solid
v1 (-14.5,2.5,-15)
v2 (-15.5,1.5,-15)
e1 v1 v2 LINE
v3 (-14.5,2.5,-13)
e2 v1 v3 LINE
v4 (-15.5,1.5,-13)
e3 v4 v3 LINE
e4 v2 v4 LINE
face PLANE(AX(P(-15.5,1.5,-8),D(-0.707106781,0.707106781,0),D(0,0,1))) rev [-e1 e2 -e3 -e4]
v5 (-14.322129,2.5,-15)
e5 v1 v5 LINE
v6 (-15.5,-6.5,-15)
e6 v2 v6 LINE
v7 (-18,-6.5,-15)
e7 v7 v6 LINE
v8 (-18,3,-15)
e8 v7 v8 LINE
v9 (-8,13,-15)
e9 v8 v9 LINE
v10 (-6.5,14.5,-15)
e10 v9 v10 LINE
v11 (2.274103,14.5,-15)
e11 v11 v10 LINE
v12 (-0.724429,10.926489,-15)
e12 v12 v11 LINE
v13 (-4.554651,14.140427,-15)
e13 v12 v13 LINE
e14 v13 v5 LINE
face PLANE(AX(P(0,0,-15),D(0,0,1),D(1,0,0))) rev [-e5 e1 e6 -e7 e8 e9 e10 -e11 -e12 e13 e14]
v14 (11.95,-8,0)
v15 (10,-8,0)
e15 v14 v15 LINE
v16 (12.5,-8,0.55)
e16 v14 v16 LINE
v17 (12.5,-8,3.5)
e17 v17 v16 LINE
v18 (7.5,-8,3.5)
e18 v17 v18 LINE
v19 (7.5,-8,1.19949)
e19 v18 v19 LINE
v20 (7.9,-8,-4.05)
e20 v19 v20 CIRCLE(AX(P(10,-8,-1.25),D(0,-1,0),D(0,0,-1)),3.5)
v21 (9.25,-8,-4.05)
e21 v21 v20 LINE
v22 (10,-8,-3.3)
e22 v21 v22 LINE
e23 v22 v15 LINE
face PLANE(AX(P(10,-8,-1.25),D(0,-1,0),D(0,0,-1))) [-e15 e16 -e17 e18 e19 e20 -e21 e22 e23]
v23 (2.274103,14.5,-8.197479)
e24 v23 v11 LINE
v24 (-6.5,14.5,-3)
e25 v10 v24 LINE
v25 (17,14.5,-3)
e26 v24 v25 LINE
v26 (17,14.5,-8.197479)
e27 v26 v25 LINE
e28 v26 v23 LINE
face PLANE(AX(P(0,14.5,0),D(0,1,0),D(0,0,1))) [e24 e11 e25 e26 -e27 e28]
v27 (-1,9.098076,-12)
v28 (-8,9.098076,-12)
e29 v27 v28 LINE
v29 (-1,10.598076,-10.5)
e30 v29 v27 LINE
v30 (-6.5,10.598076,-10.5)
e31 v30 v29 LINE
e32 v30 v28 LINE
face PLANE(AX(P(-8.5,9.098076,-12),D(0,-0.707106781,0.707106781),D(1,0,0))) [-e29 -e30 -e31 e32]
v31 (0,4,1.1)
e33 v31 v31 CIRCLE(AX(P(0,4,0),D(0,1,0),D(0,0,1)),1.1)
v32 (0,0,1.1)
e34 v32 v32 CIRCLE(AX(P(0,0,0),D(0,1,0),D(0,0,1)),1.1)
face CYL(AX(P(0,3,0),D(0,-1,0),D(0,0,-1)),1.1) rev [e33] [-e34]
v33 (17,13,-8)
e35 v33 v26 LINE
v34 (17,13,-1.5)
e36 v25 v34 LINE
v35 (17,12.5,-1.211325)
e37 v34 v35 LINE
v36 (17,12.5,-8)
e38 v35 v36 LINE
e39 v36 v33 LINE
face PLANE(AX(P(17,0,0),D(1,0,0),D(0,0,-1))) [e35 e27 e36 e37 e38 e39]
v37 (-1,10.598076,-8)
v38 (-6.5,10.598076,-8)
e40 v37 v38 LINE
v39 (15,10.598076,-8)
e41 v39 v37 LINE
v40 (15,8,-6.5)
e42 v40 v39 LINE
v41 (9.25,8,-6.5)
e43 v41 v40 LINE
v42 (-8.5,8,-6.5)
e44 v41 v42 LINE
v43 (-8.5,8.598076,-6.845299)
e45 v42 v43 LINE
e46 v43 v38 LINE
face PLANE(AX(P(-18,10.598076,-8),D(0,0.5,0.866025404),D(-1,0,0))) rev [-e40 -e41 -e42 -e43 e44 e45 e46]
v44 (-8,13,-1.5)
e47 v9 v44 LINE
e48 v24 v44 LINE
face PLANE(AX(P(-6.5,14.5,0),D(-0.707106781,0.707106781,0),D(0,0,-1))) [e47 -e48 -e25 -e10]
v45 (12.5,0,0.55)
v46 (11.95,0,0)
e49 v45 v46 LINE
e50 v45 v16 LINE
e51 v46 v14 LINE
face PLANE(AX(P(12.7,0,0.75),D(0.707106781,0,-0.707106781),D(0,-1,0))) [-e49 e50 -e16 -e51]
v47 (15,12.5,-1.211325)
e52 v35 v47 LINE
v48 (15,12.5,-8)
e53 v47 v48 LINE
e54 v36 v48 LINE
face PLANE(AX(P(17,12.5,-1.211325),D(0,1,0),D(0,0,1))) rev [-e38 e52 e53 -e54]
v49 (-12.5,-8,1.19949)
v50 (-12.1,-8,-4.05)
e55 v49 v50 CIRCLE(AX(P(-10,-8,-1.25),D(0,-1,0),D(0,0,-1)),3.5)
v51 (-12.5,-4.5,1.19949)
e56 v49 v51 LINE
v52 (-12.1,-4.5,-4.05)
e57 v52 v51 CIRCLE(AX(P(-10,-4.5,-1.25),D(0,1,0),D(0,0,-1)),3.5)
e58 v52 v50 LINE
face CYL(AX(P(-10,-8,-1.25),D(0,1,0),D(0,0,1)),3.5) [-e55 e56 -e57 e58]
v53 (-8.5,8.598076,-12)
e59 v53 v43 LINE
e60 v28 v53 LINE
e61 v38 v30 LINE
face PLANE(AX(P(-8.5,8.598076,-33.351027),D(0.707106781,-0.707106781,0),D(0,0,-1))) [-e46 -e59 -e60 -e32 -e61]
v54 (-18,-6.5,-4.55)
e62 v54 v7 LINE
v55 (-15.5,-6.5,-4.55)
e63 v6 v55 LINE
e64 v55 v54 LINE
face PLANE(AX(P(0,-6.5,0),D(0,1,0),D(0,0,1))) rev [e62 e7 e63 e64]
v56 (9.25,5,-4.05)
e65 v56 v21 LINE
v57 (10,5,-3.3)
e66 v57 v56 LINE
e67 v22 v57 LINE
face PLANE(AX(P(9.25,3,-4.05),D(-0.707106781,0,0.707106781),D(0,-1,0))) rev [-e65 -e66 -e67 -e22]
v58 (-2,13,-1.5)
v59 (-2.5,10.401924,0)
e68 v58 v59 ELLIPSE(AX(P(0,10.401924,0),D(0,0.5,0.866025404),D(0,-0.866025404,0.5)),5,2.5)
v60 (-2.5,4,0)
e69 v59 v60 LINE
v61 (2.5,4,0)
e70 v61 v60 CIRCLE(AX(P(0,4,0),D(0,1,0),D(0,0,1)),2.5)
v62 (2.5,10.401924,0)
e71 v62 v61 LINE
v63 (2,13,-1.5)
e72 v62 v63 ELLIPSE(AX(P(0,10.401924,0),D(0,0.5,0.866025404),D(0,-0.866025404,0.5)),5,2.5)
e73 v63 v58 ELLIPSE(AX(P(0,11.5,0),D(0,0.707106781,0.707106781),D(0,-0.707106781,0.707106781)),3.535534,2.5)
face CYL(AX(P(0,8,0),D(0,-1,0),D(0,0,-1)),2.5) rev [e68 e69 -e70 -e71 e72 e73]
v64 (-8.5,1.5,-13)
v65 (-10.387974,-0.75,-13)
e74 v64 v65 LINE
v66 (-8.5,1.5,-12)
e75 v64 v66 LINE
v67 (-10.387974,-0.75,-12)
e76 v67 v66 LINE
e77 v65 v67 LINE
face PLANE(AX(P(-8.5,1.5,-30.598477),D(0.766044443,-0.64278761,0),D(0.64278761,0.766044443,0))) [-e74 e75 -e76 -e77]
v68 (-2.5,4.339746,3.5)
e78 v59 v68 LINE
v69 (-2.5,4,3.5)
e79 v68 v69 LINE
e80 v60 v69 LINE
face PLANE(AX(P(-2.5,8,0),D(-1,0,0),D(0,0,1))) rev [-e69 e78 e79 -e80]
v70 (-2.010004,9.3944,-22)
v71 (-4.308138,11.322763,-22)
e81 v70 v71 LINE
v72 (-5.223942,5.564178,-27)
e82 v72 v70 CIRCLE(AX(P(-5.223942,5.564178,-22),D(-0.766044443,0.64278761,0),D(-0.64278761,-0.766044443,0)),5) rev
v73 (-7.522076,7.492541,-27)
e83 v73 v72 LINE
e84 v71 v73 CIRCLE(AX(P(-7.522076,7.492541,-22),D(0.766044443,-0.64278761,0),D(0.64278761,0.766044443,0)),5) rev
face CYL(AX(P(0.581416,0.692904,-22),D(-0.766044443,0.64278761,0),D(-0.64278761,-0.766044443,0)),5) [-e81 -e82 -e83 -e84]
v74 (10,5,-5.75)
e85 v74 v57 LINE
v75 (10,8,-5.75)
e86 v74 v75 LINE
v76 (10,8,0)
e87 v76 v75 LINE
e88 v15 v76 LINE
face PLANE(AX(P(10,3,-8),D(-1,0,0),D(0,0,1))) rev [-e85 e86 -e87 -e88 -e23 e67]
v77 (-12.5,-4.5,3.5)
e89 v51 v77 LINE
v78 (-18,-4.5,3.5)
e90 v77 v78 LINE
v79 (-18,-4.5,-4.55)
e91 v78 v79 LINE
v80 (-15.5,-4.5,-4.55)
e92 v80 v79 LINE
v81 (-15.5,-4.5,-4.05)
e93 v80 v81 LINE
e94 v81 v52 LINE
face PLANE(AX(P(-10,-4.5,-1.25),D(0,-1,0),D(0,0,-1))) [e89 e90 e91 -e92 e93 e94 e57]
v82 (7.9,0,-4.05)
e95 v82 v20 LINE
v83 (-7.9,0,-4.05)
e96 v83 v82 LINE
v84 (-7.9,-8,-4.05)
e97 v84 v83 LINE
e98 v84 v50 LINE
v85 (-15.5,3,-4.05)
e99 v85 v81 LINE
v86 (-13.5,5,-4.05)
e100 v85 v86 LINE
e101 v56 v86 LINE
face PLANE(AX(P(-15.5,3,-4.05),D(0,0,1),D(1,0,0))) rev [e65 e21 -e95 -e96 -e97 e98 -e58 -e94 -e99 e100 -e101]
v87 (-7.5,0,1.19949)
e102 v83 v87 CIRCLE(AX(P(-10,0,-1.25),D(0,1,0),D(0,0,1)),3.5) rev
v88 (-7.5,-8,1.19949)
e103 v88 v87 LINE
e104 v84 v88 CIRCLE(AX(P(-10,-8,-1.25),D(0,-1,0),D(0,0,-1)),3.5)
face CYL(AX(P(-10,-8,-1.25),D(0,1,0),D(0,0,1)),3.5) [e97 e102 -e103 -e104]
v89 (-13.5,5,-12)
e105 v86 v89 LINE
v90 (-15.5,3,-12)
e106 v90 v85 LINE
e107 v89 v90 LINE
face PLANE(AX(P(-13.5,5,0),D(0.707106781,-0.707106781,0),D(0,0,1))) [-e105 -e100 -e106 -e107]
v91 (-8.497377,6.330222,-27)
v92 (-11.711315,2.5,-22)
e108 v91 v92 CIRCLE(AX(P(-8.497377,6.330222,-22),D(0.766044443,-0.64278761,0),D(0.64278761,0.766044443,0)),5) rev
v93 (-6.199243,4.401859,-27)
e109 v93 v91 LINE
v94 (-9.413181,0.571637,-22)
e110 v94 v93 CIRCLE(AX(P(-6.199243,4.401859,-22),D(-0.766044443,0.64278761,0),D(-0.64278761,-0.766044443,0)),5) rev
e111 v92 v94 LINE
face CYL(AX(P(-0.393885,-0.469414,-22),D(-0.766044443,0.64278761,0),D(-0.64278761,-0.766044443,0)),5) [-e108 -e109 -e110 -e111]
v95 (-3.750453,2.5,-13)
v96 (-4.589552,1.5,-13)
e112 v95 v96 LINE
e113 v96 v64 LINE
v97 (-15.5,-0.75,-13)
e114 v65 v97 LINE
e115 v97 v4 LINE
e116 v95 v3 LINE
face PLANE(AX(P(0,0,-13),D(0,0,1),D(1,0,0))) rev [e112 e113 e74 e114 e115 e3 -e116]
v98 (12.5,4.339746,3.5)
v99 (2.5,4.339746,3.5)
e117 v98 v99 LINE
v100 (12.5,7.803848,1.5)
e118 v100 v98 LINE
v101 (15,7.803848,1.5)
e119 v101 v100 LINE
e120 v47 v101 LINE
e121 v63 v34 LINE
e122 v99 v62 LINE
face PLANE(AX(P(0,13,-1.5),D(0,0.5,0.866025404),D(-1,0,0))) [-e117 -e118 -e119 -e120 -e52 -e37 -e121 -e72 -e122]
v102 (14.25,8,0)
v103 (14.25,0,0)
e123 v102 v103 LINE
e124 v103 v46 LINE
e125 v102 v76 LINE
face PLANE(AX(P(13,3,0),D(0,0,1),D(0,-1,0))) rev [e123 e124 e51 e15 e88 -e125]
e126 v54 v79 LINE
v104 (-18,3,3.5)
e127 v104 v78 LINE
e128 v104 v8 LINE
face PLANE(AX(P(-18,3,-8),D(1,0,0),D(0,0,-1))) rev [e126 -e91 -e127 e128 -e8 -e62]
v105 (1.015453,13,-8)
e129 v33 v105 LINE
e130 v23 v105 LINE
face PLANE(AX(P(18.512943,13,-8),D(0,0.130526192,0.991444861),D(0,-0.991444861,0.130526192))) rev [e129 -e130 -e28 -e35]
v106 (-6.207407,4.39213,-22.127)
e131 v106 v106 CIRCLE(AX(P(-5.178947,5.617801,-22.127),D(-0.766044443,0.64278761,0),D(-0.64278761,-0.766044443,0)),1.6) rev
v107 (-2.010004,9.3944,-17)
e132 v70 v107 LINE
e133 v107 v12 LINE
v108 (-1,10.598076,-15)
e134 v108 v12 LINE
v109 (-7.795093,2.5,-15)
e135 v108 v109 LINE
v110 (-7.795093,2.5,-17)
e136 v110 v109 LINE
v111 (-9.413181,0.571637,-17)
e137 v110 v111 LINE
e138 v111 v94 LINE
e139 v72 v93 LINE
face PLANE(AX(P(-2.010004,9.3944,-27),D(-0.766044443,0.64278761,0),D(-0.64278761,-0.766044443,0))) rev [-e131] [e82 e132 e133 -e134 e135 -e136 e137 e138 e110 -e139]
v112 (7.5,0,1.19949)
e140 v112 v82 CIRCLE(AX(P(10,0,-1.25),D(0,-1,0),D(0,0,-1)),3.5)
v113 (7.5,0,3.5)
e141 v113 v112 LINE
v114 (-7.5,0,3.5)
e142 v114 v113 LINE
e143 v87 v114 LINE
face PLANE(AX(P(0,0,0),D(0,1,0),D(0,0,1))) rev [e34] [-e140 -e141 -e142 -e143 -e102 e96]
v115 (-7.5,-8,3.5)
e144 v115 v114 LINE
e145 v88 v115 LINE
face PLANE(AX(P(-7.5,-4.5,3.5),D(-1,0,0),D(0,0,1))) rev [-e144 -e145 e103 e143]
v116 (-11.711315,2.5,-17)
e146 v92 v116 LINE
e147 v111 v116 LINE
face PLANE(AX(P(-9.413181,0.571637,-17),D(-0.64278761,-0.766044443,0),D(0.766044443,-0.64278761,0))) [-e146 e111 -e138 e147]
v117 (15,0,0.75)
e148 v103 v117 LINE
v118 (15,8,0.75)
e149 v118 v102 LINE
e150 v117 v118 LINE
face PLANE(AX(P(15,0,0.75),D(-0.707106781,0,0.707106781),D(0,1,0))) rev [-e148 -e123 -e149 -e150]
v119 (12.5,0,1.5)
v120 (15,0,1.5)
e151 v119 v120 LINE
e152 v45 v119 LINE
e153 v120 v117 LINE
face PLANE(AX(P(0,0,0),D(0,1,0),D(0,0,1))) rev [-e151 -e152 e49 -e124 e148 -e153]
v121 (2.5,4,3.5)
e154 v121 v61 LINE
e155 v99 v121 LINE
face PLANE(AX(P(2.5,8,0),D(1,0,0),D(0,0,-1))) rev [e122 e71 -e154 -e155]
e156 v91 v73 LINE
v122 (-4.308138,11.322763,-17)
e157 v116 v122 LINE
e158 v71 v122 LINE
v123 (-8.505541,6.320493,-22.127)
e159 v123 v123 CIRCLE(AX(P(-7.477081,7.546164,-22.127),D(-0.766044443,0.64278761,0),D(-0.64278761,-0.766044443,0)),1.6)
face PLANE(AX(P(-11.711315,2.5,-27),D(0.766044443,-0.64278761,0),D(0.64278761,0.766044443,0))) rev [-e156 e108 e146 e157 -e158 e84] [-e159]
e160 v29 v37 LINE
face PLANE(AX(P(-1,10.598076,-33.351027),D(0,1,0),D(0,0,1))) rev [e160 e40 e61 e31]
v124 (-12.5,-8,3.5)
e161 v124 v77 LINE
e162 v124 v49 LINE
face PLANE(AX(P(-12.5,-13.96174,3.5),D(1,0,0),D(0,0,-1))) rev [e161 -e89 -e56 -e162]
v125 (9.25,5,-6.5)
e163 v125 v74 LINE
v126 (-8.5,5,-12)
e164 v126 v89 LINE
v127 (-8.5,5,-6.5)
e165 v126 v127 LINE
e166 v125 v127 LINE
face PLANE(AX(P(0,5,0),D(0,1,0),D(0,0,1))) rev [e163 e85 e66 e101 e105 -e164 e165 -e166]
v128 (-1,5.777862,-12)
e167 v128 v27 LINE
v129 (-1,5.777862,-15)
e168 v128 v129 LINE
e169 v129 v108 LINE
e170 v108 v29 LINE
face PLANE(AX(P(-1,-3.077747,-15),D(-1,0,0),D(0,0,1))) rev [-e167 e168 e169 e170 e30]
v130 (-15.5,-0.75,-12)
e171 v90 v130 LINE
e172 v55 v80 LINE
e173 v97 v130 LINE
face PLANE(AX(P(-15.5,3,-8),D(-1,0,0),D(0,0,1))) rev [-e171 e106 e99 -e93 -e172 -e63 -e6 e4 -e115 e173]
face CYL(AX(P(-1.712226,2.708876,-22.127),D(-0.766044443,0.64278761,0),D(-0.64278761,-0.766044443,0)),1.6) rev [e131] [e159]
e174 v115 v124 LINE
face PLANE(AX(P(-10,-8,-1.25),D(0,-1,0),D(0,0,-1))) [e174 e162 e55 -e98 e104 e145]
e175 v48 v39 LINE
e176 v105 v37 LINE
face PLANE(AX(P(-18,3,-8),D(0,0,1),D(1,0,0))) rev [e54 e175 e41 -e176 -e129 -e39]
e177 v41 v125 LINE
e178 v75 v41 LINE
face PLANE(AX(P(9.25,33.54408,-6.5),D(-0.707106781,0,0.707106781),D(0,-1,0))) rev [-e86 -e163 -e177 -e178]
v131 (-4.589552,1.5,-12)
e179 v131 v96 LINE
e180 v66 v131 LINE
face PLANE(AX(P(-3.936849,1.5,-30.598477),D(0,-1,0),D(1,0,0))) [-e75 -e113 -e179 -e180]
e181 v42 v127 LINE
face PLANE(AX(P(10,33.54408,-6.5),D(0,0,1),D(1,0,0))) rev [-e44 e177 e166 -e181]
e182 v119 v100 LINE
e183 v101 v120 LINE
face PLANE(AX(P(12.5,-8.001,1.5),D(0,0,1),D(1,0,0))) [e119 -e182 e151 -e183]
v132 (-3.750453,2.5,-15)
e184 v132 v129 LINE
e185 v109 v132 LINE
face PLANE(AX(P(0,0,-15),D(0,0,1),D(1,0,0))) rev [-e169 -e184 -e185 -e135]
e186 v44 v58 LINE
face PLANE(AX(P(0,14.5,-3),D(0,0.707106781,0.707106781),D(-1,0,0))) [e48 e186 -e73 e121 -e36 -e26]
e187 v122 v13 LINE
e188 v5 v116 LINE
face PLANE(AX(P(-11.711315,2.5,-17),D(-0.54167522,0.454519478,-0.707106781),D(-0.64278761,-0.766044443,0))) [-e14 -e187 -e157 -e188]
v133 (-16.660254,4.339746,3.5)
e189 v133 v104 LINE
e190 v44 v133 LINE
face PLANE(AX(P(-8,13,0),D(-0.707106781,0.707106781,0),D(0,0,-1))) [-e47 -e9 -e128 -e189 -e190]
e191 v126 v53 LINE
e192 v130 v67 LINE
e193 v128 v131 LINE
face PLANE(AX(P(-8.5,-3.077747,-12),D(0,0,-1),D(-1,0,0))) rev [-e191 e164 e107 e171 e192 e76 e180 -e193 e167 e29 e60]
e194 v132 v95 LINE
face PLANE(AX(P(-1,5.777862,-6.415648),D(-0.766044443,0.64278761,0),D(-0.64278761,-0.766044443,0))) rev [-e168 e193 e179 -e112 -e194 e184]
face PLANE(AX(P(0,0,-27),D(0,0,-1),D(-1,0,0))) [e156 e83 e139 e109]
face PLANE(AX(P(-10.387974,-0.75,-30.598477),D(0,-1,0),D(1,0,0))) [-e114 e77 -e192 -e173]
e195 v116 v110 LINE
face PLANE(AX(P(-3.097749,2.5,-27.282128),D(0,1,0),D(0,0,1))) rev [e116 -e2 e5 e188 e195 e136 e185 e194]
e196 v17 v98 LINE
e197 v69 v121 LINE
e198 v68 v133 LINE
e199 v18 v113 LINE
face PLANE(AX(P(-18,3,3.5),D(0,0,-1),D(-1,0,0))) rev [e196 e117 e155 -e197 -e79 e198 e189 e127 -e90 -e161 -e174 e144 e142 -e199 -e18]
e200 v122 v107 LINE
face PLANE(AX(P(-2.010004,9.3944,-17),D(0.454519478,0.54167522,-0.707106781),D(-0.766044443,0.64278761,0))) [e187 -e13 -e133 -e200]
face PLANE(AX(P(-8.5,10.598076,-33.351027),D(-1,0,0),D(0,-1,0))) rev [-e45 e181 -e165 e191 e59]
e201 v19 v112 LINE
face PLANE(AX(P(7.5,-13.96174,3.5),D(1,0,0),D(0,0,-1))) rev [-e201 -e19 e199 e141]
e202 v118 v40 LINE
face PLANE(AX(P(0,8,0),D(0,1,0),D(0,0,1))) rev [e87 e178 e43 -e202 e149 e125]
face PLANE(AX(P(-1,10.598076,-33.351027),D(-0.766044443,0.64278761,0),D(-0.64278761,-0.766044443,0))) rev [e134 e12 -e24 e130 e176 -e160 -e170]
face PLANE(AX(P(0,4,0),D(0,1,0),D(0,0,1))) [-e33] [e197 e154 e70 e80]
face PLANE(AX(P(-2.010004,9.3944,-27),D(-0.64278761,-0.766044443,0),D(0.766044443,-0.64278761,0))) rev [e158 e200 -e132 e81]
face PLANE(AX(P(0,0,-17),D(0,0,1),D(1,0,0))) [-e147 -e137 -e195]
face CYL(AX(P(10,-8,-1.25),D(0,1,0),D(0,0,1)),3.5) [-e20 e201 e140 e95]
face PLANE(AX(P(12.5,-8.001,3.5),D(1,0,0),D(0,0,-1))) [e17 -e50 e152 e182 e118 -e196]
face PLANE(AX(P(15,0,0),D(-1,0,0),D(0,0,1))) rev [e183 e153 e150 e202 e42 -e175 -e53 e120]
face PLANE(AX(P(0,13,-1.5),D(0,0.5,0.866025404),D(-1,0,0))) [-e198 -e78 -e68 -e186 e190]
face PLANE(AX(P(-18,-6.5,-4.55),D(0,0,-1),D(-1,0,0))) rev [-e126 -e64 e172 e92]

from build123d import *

# Parameters (mm, degrees)
SKETCH_1_W                      = 28
SKETCH_1_H                      = 11.5
SKETCH_1_R                      = 1.1
EXTRUDE_1_DEPTH                 = 3
SKETCH_2_R                      = 3.5
EXTRUDE_2_DEPTH                 = 8
CUT_EXTRUDE_1_DEPTH             = 22.260291625
CUT_EXTRUDE_1_DEPTH_BACK        = 22.260291625
SKETCH_3_W                      = 25.5
SKETCH_3_H                      = 3.95
EXTRUDE_3_DEPTH                 = 3
SKETCH_5_W                      = 3.5
SKETCH_5_H                      = 3
EXTRUDE_4_DEPTH                 = 2
EXTRUDE_5_DEPTH                 = 5
EXTRUDE_6_DEPTH                 = 5
SKETCH_8_W                      = 25.5
SKETCH_8_H                      = 3.95
EXTRUDE_7_DEPTH                 = 3
EXTRUDE_8_DEPTH                 = 4.5
SKETCH_10_W                     = 2.5
SKETCH_10_H                     = 17.5
EXTRUDE_9_DEPTH                 = 7
SKETCH_11_W                     = 25.5
SKETCH_11_H                     = 1.5
CUT_EXTRUDE_2_DEPTH             = 3
CHAMFER_1_SIZE                  = 1.5
CHAMFER_1_SIZE2                 = 2.598076211
EXTRUDE_10_REACH                = 31.245
EXTRUDE_10_DIRECTION_2_REACH    = 31.245
SKETCH_13_W                     = 3.5
SKETCH_13_H                     = 8
CUT_EXTRUDE_3_DEPTH             = 0.3
CHAMFER_2_SIZE                  = 0.75
SKETCH_14_W                     = 2.5
SKETCH_14_H                     = 2
CUT_EXTRUDE_4_DEPTH             = 30.244657632
CUT_EXTRUDE_4_DIRECTION_2_REACH = 31.245
CUT_EXTRUDE_5_REACH             = 29.663
SKETCH_15_W                     = 2.5
SKETCH_15_H                     = 8
SKETCH_16_R                     = 1.1
EXTRUDE_11_DEPTH                = 1
EXTRUDE_12_DEPTH                = 8.5
SKETCH_20_W                     = 7.5
SKETCH_20_H                     = 3
EXTRUDE_14_DEPTH                = 5.598076211
EXTRUDE_15_DEPTH                = 3
CUT_EXTRUDE_6_DEPTH             = 2
SKETCH_24_W                     = 2.5
SKETCH_24_H                     = 10.45
EXTRUDE_16_DEPTH                = 2
CUT_EXTRUDE_7_REACH             = 29.663
SKETCH_25_W                     = 13.241350553
SKETCH_25_H                     = 2
CHAMFER_3_SIZE                  = 1.5
CHAMFER_5_SIZE                  = 5
CHAMFER_5_SIZE2                 = 8.660254038
CHAMFER_6_SIZE                  = 10
CHAMFER_7_SIZE                  = 2
CHAMFER_8_SIZE                  = 2
EXTRUDE_17_DEPTH                = 1.5
EXTRUDE_21_DEPTH                = 2
EXTRUDE_18_DEPTH                = 2
CHAMFER_9_SIZE                  = 1.5
EXTRUDE_19_DEPTH                = 15.984546635
EXTRUDE_20_REACH                = 31.606
CUT_EXTRUDE_8_REACH             = 31.606
EXTRUDE_22_DEPTH                = 12
SKETCH_36_R                     = 1.6
CUT_EXTRUDE_9_DEPTH             = 3
EXTRUDE_23_DEPTH                = 10
FILLET_1_R                      = 5


# Some blends are built 0.0001 mm under size
with BuildPart() as part:
    # 草图1 → 凸台-拉伸1 (new body)
    with BuildSketch(Plane(origin=(0, 0, 0), x_dir=(1, 0, 0), z_dir=(0, 1, 0))):
        with Locations((-4, 2.25)):
            Rectangle(SKETCH_1_W, SKETCH_1_H)
        with Locations(Location((0, 0, 0), (0, 0, 270))):
            Circle(SKETCH_1_R, mode=Mode.SUBTRACT)
    extrude(amount=EXTRUDE_1_DEPTH)

    # 草图2 → 凸台-拉伸2 (add)
    with BuildSketch(Plane.XZ):
        with Locations(Location((-10, -1.25, 0), (0, 0, 90))):
            Circle(SKETCH_2_R)
        with BuildLine():
            Line((10, 2.25), (10, -4.75))
            ThreePointArc((10, -4.75), (6.5, -1.25), (10, 2.25))
        make_face()
    extrude(amount=EXTRUDE_2_DEPTH)

    # 草图3 → 切除-拉伸1 (cut, two sides: drawn at the far end of the back side and taken through both)
    with BuildSketch(Plane.XZ.offset(-CUT_EXTRUDE_1_DEPTH_BACK)):
        with Locations((-2.75, -6.025)):
            Rectangle(SKETCH_3_W, SKETCH_3_H)
    extrude(amount=CUT_EXTRUDE_1_DEPTH + CUT_EXTRUDE_1_DEPTH_BACK, mode=Mode.SUBTRACT)

    # 草图4 → 凸台-拉伸3 (add)
    with BuildSketch(Plane(origin=(10, 0, 0), x_dir=(0, 0, -1), z_dir=(1, 0, 0))):
        Polygon((0, 3), (0, -8), (-2.25, -8), (-2.25, 0), (-3.5, 0), (-3.5, 3), align=None)
    extrude(amount=EXTRUDE_3_DEPTH)

    # 草图5 → 凸台-拉伸4 (add)
    with BuildSketch(Plane(origin=(13, 0, 0), x_dir=(0, 0, -1), z_dir=(1, 0, 0))):
        with Locations((-1.75, 1.5)):
            Rectangle(SKETCH_5_W, SKETCH_5_H)
    extrude(amount=EXTRUDE_4_DEPTH)

    # 草图6 → 凸台-拉伸5 (add)
    with BuildSketch(Plane(origin=(0, 3, 0), x_dir=(1, 0, 0), z_dir=(0, 1, 0))):
        with BuildLine():
            Line((-2.5, 0), (-2.5, -3.5))
            Line((-2.5, -3.5), (-18, -3.5))
            Line((-18, -3.5), (-18, 8))
            Line((-18, 8), (-15.5, 8))
            Line((-15.5, 8), (-15.5, 4.05))
            Line((-15.5, 4.05), (10, 4.05))
            Line((10, 4.05), (10, 0))
            Line((10, 0), (15, 0))
            Line((15, 0), (15, -3.5))
            Line((15, -3.5), (2.5, -3.5))
            Line((2.5, -3.5), (2.5, 0))
            ThreePointArc((2.5, 0), (0, 2.5), (-2.5, 0))
        make_face()
    extrude(amount=EXTRUDE_5_DEPTH)

    # 草图7 → 凸台-拉伸6 (add)
    with BuildSketch(Plane(origin=(0, 8, 0), x_dir=(1, 0, 0), z_dir=(0, 1, 0))):
        with BuildLine():
            Line((10, 0), (10, 4.05))
            Line((10, 4.05), (-15.5, 4.05))
            Line((-15.5, 4.05), (-15.5, 8))
            Line((-15.5, 8), (-18, 8))
            Line((-18, 8), (-18, -3.5))
            Line((-18, -3.5), (-2.5, -3.5))
            Line((-2.5, -3.5), (-2.5, 0))
            ThreePointArc((-2.5, 0), (0, 2.5), (2.5, 0))
            Line((2.5, 0), (2.5, -3.5))
            Line((2.5, -3.5), (15, -3.5))
            Line((15, -3.5), (15, 0))
            Line((15, 0), (10, 0))
        make_face()
        Polygon((10, 0), (15, 0), (15, 8), (-15.5, 8), (-15.5, 4.05), (10, 4.05), align=None)
    extrude(amount=EXTRUDE_6_DEPTH)

    # 草图8 → 凸台-拉伸7 (add)
    with BuildSketch(Plane.XZ.offset(-8)):
        with Locations((-2.75, -6.025)):
            Rectangle(SKETCH_8_W, SKETCH_8_H)
    extrude(amount=EXTRUDE_7_DEPTH)

    # 草图9 → 凸台-拉伸8 (add)
    with BuildSketch(Plane.XZ):
        with BuildLine():
            Line((-12.1, -4.05), (-15.5, -4.05))
            Line((-15.5, -4.05), (-15.5, -8))
            Line((-15.5, -8), (-18, -8))
            Line((-18, -8), (-18, -4.05))
            Line((-18, -4.05), (-18, 3.5))
            Line((-18, 3.5), (-7.5, 3.5))
            Line((-7.5, 3.5), (-7.5, 1.199489743))
            ThreePointArc((-7.5, 1.199489743), (-12.632353631, 1.056667371), (-12.1, -4.05))
        make_face()
    extrude(amount=EXTRUDE_8_DEPTH)

    # 草图10 → 凸台-拉伸9 (add)
    with BuildSketch(Plane(origin=(0, 0, -8), x_dir=(-1, 0, 0), z_dir=(0, 0, -1))):
        with Locations((16.75, 4.25)):
            Rectangle(SKETCH_10_W, SKETCH_10_H)
    extrude(amount=EXTRUDE_9_DEPTH)

    # 草图11 → 切除-拉伸2 (cut)
    with BuildSketch(Plane.XZ.offset(-5)):
        with Locations((-2.75, -7.25)):
            Rectangle(SKETCH_11_W, SKETCH_11_H)
    extrude(amount=-CUT_EXTRUDE_2_DEPTH, mode=Mode.SUBTRACT)

    # 倒角1
    chamfer_1_edges = [part.edges().sort_by_distance(p)[0] for p in [
        (-0.25, 8, -8),
    ]]
    chamfer_1_side = [part.faces().sort_by_distance(p)[0] for p in [
        (-15.184682699, 8, -7.25),
    ]]
    chamfer(chamfer_1_edges, length=CHAMFER_1_SIZE, length2=CHAMFER_1_SIZE2, reference=chamfer_1_side[0])

    # 凸台-拉伸10: up to this face of the body (flat: up to its plane)
    extrude_10_end = Plane(part.part.faces().sort_by_distance((-10, -8, -1.080764101))[0])
    # 草图12 → 凸台-拉伸10 (add, up to the picked face)
    with BuildSketch(Plane.XZ.offset(4.5), mode=Mode.PRIVATE) as extrude_10_sk1:
        with BuildLine():
            Line((-12.5, 3.5), (-12.5, 1.199489743))
            ThreePointArc((-12.5, 1.199489743), (-10, 2.25), (-7.5, 1.199489743))
            Line((-7.5, 1.199489743), (-7.5, 3.5))
            Line((-7.5, 3.5), (-12.5, 3.5))
        make_face()
    extrude_10_tool1 = split(extrude(extrude_10_sk1.sketch, amount=EXTRUDE_10_REACH, mode=Mode.PRIVATE), bisect_by=extrude_10_end, keep=Keep.BOTH, mode=Mode.PRIVATE)
    # 草图12 → 凸台-拉伸10 (add, up to the picked face)
    with BuildSketch(Plane.XZ.offset(4.5), mode=Mode.PRIVATE) as extrude_10_sk2:
        with BuildLine():
            Line((7.5, 3.5), (7.5, 1.199489743))
            ThreePointArc((7.5, 1.199489743), (8.644126499, 1.976702194), (10, 2.25))
            Line((10, 2.25), (12.5, 2.25))
            Line((12.5, 2.25), (13, 2.25))
            Line((13, 2.25), (13, 3.5))
            Line((13, 3.5), (12.5, 3.5))
            Line((12.5, 3.5), (7.5, 3.5))
        make_face()
    extrude_10_tool2 = split(extrude(extrude_10_sk2.sketch, amount=EXTRUDE_10_REACH, mode=Mode.PRIVATE), bisect_by=extrude_10_end, keep=Keep.BOTH, mode=Mode.PRIVATE)
    add(extrude_10_tool1.solids().sort_by(Axis((-10, -4.5, 2.682619), (0, -1, 0)))[0])
    add(extrude_10_tool2.solids().sort_by(Axis((10.022618, -4.5, 2.776432), (0, -1, 0)))[0])

    # 凸台-拉伸10 direction 2: up to this face of the body (flat: up to its plane)
    extrude_10_direction_2_end = Plane(part.part.faces().sort_by_distance((1.489654817, 0, 0.088188875))[0])
    # 草图12 → 凸台-拉伸10 direction 2 (add, up to the picked face)
    with BuildSketch(Plane.XZ.offset(4.5), mode=Mode.PRIVATE) as extrude_10_direction_2_sk1:
        with BuildLine():
            Line((-12.5, 3.5), (-12.5, 1.199489743))
            ThreePointArc((-12.5, 1.199489743), (-10, 2.25), (-7.5, 1.199489743))
            Line((-7.5, 1.199489743), (-7.5, 3.5))
            Line((-7.5, 3.5), (-12.5, 3.5))
        make_face()
    extrude_10_direction_2_tool1 = split(extrude(extrude_10_direction_2_sk1.sketch, amount=-EXTRUDE_10_DIRECTION_2_REACH, mode=Mode.PRIVATE), bisect_by=extrude_10_direction_2_end, keep=Keep.BOTH, mode=Mode.PRIVATE)
    # 草图12 → 凸台-拉伸10 direction 2 (add, up to the picked face)
    with BuildSketch(Plane.XZ.offset(4.5), mode=Mode.PRIVATE) as extrude_10_direction_2_sk2:
        with BuildLine():
            Line((7.5, 3.5), (7.5, 1.199489743))
            ThreePointArc((7.5, 1.199489743), (8.644126499, 1.976702194), (10, 2.25))
            Line((10, 2.25), (12.5, 2.25))
            Line((12.5, 2.25), (13, 2.25))
            Line((13, 2.25), (13, 3.5))
            Line((13, 3.5), (12.5, 3.5))
            Line((12.5, 3.5), (7.5, 3.5))
        make_face()
    extrude_10_direction_2_tool2 = split(extrude(extrude_10_direction_2_sk2.sketch, amount=-EXTRUDE_10_DIRECTION_2_REACH, mode=Mode.PRIVATE), bisect_by=extrude_10_direction_2_end, keep=Keep.BOTH, mode=Mode.PRIVATE)
    add(extrude_10_direction_2_tool1.solids().sort_by(Axis((-10, -4.5, 2.682619), (0, 1, 0)))[0])
    add(extrude_10_direction_2_tool2.solids().sort_by(Axis((10.022618, -4.5, 2.776432), (0, 1, 0)))[0])

    # 草图13 → 切除-拉伸3 (cut)
    with BuildSketch(Plane(origin=(13, 0, 0), x_dir=(0, 0, -1), z_dir=(1, 0, 0))):
        with Locations((-1.75, -4)):
            Rectangle(SKETCH_13_W, SKETCH_13_H)
    extrude(amount=-CUT_EXTRUDE_3_DEPTH, mode=Mode.SUBTRACT)

    # 倒角2
    chamfer_2_edges = [part.edges().sort_by_distance(p)[0] for p in [
        (10, -1.5, -4.05),
        (10, 6.5, -6.5),
        (12.7, -4, 0),
        (15, 4, 0),
    ]]
    chamfer(chamfer_2_edges, length=CHAMFER_2_SIZE)

    # 草图14 → 切除-拉伸4 (cut)
    with BuildSketch(Plane.XZ.offset(4.5)):
        with Locations((13.75, 2.5)):
            Rectangle(SKETCH_14_W, SKETCH_14_H)
    extrude(amount=-CUT_EXTRUDE_4_DEPTH, mode=Mode.SUBTRACT)

    # 草图14 → 切除-拉伸4 direction 2 (cut, up to next)
    with BuildSketch(Plane.XZ.offset(4.5), mode=Mode.PRIVATE) as cut_extrude_4_direction_2_sk1:
        with Locations((13.75, 2.5)):
            Rectangle(SKETCH_14_W, SKETCH_14_H)
    cut_extrude_4_direction_2_tool1 = extrude(cut_extrude_4_direction_2_sk1.sketch, amount=CUT_EXTRUDE_4_DIRECTION_2_REACH, mode=Mode.PRIVATE) & part.part
    add(cut_extrude_4_direction_2_tool1.solids().sort_by_distance((13.75, -4.5, 2.5))[0], mode=Mode.SUBTRACT)

    # 草图15 → 切除-拉伸5 (cut, up to next)
    with BuildSketch(Plane.XY.offset(1.5), mode=Mode.PRIVATE) as cut_extrude_5_sk1:
        with Locations((13.75, -4)):
            Rectangle(SKETCH_15_W, SKETCH_15_H)
    cut_extrude_5_tool1 = extrude(cut_extrude_5_sk1.sketch, amount=-CUT_EXTRUDE_5_REACH, mode=Mode.PRIVATE) & part.part
    add(cut_extrude_5_tool1.solids().sort_by_distance((13.75, -4, 1.5))[0], mode=Mode.SUBTRACT)

    # 草图16 → 凸台-拉伸11 (add)
    with BuildSketch(Plane(origin=(0, 3, 0), x_dir=(1, 0, 0), z_dir=(0, 1, 0))):
        with BuildLine():
            Line((2.5, -3.5), (2.5, 0))
            ThreePointArc((2.5, 0), (0, 2.5), (-2.5, 0))
            Line((-2.5, 0), (-2.5, -3.5))
            Line((-2.5, -3.5), (2.5, -3.5))
        make_face()
        with Locations(Location((0, 0, 0), (0, 0, 270))):
            Circle(SKETCH_16_R, mode=Mode.SUBTRACT)
    extrude(amount=EXTRUDE_11_DEPTH)

    # 草图18 → 凸台-拉伸12 (add)
    with BuildSketch(Plane(origin=(0, 0, -6.5), x_dir=(-1, 0, 0), z_dir=(0, 0, -1))):
        Polygon((15.5, 5), (8.5, 5), (8.5, 10.598076211), (1, 10.598076211), (-1.015453365, 13), (1, 13), (15.5, 13), align=None)
    extrude(amount=EXTRUDE_12_DEPTH)

    # 草图20 → 凸台-拉伸14 (add)
    with BuildSketch(Plane.XZ.offset(-10.598076211)):
        with Locations((-4.75, -13.5)):
            Rectangle(SKETCH_20_W, SKETCH_20_H)
    extrude(amount=EXTRUDE_14_DEPTH)

    # 草图21 → 凸台-拉伸15 (add)
    with BuildSketch(Plane.XY.offset(-12)):
        Polygon((-1, 5), (-3.936848709, 1.5), (-8.5, 1.5), (-10.38797417, -0.75), (-15.5, -0.75), (-15.5, 1.5), (-15.5, 5), align=None)
    extrude(amount=-EXTRUDE_15_DEPTH)

    # 草图23 → 切除-拉伸6 (cut)
    with BuildSketch(Plane(origin=(0, 0, -15), x_dir=(-1, 0, 0), z_dir=(0, 0, -1))):
        Polygon((8.5, 1.5), (15.5, 1.5), (15.5, -0.75), (10.38797417, -0.75), align=None)
    extrude(amount=-CUT_EXTRUDE_6_DEPTH, mode=Mode.SUBTRACT)

    # 草图24 → 凸台-拉伸16 (add)
    with BuildSketch(Plane.XZ.offset(4.5)):
        with Locations((-16.75, -9.775)):
            Rectangle(SKETCH_24_W, SKETCH_24_H)
    extrude(amount=EXTRUDE_16_DEPTH)

    # 草图25 → 切除-拉伸7 (cut, up to next)
    with BuildSketch(Plane(origin=(0, 0, -13), x_dir=(-1, 0, 0), z_dir=(0, 0, -1)), mode=Mode.PRIVATE) as cut_extrude_7_sk1:
        with Locations((8.879324724, 2.5)):
            Rectangle(SKETCH_25_W, SKETCH_25_H)
    cut_extrude_7_tool1 = extrude(cut_extrude_7_sk1.sketch, amount=CUT_EXTRUDE_7_REACH, mode=Mode.PRIVATE) & part.part
    add(cut_extrude_7_tool1.solids().sort_by_distance((-8.879325, 2.5, -13))[0], mode=Mode.SUBTRACT)

    # 倒角3
    chamfer_3_edges = [part.edges().sort_by_distance(p)[0] for p in [
        (-4.75, 10.598076211, -12),
    ]]
    chamfer(chamfer_3_edges, length=CHAMFER_3_SIZE)

    # 倒角5
    chamfer_5_edges = [part.edges().sort_by_distance(p)[0] for p in [
        (-10.25, 13, 3.5),
        (7.5, 13, 3.5),
    ]]
    chamfer_5_side = [part.faces().sort_by_distance(p)[0] for p in [
        (-3.681918062, 13, -5.033050498),
    ]]
    chamfer(chamfer_5_edges, length=CHAMFER_5_SIZE, length2=CHAMFER_5_SIZE2, reference=chamfer_5_side[0])

    # 倒角6
    chamfer_6_edges = [part.edges().sort_by_distance(p)[0] for p in [
        (-18, 13, -8.25),
    ]]
    chamfer(chamfer_6_edges, length=CHAMFER_6_SIZE)

    # 倒角7
    chamfer_7_edges = [part.edges().sort_by_distance(p)[0] for p in [
        (-15.5, 3.5, -14),
    ]]
    chamfer(chamfer_7_edges, length=CHAMFER_7_SIZE)

    # 倒角8
    chamfer_8_edges = [part.edges().sort_by_distance(p)[0] for p in [
        (-15.5, 5, -8.025),
        (-8.5, 10.598076211, -9.25),
    ]]
    chamfer(chamfer_8_edges, length=CHAMFER_8_SIZE)

    # 草图28 → 凸台-拉伸17 (add)
    with BuildSketch(Plane(origin=(0, 13, 0), x_dir=(1, 0, 0), z_dir=(0, 1, 0))):
        with BuildLine():
            Line((1.015453365, 15), (-8, 15))
            Line((-8, 15), (-8, 1.5))
            Line((-8, 1.5), (-2, 1.5))
            ThreePointArc((-2, 1.5), (0, 2.5), (2, 1.5))
            Line((2, 1.5), (15, 1.5))
            Line((15, 1.5), (15, 8))
            Line((15, 8), (1.015453365, 8))
            Line((1.015453365, 8), (1.015453365, 15))
        make_face()
    extrude(amount=EXTRUDE_17_DEPTH)

    # 草图34 → 凸台-拉伸21 (add)
    with BuildSketch(Plane(origin=(0, 0, -13), x_dir=(-1, 0, 0), z_dir=(0, 0, -1))):
        Polygon((2.258649447, 3.5), (3.097749078, 2.5), (14.5, 2.5), (13.5, 3.5), align=None)
    extrude(amount=EXTRUDE_21_DEPTH)

    # 草图29 → 凸台-拉伸18 (add)
    with BuildSketch(Plane(origin=(15, 0, 0), x_dir=(0, 0, -1), z_dir=(1, 0, 0))):
        Polygon((1.5, 14.5), (1.5, 13), (1.211324865, 12.5), (8, 12.5), (8, 14.5), align=None)
    extrude(amount=EXTRUDE_18_DEPTH)

    # 倒角9
    chamfer_9_edges = [part.edges().sort_by_distance(p)[0] for p in [
        (-5, 14.5, -1.5),
        (-8, 14.5, -8.25),
    ]]
    chamfer(chamfer_9_edges, length=CHAMFER_9_SIZE - 0.0001)  # a hair under: the kernel refuses the full size

    # 草图30 → 凸台-拉伸19 (add)
    with BuildSketch(Plane(origin=(1.015453365, 0, 0), x_dir=(0, 0, -1), z_dir=(1, 0, 0))):
        Polygon((8, 13), (8.197478746, 14.5), (8, 14.5), align=None)
    extrude(amount=EXTRUDE_19_DEPTH)

    # 凸台-拉伸20: up to this face of the body (flat: up to its plane)
    extrude_20_end = Plane(part.part.faces().sort_by_distance((9.007726683, 13.75, -8.098739373))[0])
    # 草图32 → 凸台-拉伸20 (add, up to the picked face)
    with BuildSketch(Plane(origin=(0, 0, -15), x_dir=(-1, 0, 0), z_dir=(0, 0, -1)), mode=Mode.PRIVATE) as extrude_20_sk1:
        Polygon((-1.015453365, 13), (-2.274102812, 14.5), (-1.015453365, 14.5), align=None)
    extrude_20_tool1 = split(extrude(extrude_20_sk1.sketch, amount=-EXTRUDE_20_REACH, mode=Mode.PRIVATE), bisect_by=extrude_20_end, keep=Keep.BOTH, mode=Mode.PRIVATE)
    add(extrude_20_tool1.solids().sort_by(Axis((1.435003, 14, -15), (0, 0, 1)))[0])

    # 切除-拉伸8: up to this face of the body (flat: up to its plane)
    cut_extrude_8_end = Plane(part.part.faces().sort_by_distance((-7.893394404, 4.143694153, -12))[0])
    # 草图33 → 切除-拉伸8 (cut, up to the picked face)
    with BuildSketch(Plane(origin=(0, 0, -15), x_dir=(-1, 0, 0), z_dir=(0, 0, -1)), mode=Mode.PRIVATE) as cut_extrude_8_sk1:
        Polygon((1, 5), (1, 5.777861913), (4.589552354, 1.5), (3.936848709, 1.5), align=None)
    cut_extrude_8_tool1 = split(extrude(cut_extrude_8_sk1.sketch, amount=-CUT_EXTRUDE_8_REACH, mode=Mode.PRIVATE), bisect_by=cut_extrude_8_end, keep=Keep.BOTH, mode=Mode.PRIVATE)
    add(cut_extrude_8_tool1.solids().sort_by(Axis((-2.63704, 3.450948, -15), (0, 0, 1)))[0], mode=Mode.SUBTRACT)

    # 草图35 → 凸台-拉伸22 (add)
    with BuildSketch(Plane(origin=(0, 0, -15), x_dir=(-1, 0, 0), z_dir=(0, 0, -1))):
        Polygon((2.010004275, 9.394399988), (7.795092762, 2.5), (11.71131463, 2.5), (4.308137604, 11.322762817), align=None)
    extrude(amount=EXTRUDE_22_DEPTH)

    # 草图36 → 切除-拉伸9 (cut)
    with BuildSketch(Plane(origin=(-8.103491228, 6.799636501, 0), x_dir=(0, 0, 1), z_dir=(-0.7660444431189746, 0.6427876096865437, 0))):
        with Locations(Location((-22.127, 0.974522064, 0), (0, 0, 270))):
            Circle(SKETCH_36_R)
    extrude(amount=-CUT_EXTRUDE_9_DEPTH, mode=Mode.SUBTRACT)

    # 草图37 → 凸台-拉伸23 (add)
    with BuildSketch(Plane(origin=(0, 0, -27), x_dir=(-1, 0, 0), z_dir=(0, 0, -1))):
        Polygon((11.71131463, 2.5), (7.795092762, 2.5), (9.413181301, 0.571637171), align=None)
    extrude(amount=-EXTRUDE_23_DEPTH)

    # 圆角1
    fillet_1_edges = [part.edges().sort_by_distance(p)[0] for p in [
        (-3.15907094, 10.358581403, -27),
        (-10.562247966, 1.535818585, -27),
    ]]
    fillet(fillet_1_edges, radius=FILLET_1_R)

    # 倒角10
    # the kernel refuses this chamfer: 2 mm, written as the material it adds along each edge
    with BuildSketch(Plane(origin=(-4.308137604, 11.322762817, -15), x_dir=(-0.017674008802754975, -0.021063063486224685, -0.9996219169112968), z_dir=(0.7660444431189742, -0.6427876096865438, 0))) as chamfer_10_piece_1:
        with BuildLine():
            Line((2.05734639, 0), (-0.11309431, 2.054235587))
            Line((-0.11309431, 2.054235587), (-0.153079186, 2.053135752))
            ThreePointArc((-0.153079186, 2.053135752), (-0.068258454, 1.026795659), (-0.039984877, -0.001099835))
            Line((-0.039984877, -0.001099835), (0.001099835, -0.039984877))
            ThreePointArc((0.001099835, -0.039984877), (1.028995329, -0.011711299), (2.058446225, -0.039984877))
            Line((2.058446225, -0.039984877), (2.05734639, 0))
        make_face()
    extrude(amount=3)
    with BuildSketch(Plane(origin=(-15.017406552, -1.440046925, -15), x_dir=(-0.765754814669836, 0.642544582561693, 0.02749587661058647), z_dir=(0.6427876096865436, 0.7660444431189746, 0))) as chamfer_10_piece_2_section:
        with BuildLine():
            Line((2.05734639, 0), (-0.11309431, -2.054235587))
            Line((-0.11309431, -2.054235587), (-0.153079186, -2.053135752))
            ThreePointArc((-0.153079186, -2.053135752), (-0.068258454, -1.026795659), (-0.039984877, 0.001099835))
            Line((-0.039984877, 0.001099835), (0.001099835, 0.039984877))
            ThreePointArc((0.001099835, 0.039984877), (1.028995329, 0.011711299), (2.058446225, 0.039984877))
            Line((2.058446225, 0.039984877), (2.05734639, 0))
        make_face()
    chamfer_10_piece_2 = extrude(amount=16.660664869, mode=Mode.PRIVATE)
    chamfer_10_piece_2 = split(chamfer_10_piece_2, bisect_by=Plane(origin=(-8.711166063, 2.5, -15.650147459), z_dir=(0, 1, 0)), keep=Keep.TOP, mode=Mode.PRIVATE)
    add(chamfer_10_piece_2)
    with BuildSketch(Plane(origin=(-8.248184529, 14.628854739, -15), x_dir=(-0.017674008802755155, -0.0210630634862249, -0.9996219169112968), z_dir=(0.7660444431189742, -0.6427876096865438, 0))) as chamfer_10_piece_3a_section:
        with BuildLine():
            Line((2.05734639, 0), (-0.11309431, 2.054235587))
            Line((-0.11309431, 2.054235587), (-0.153079186, 2.053135752))
            ThreePointArc((-0.153079186, 2.053135752), (-0.068258454, 1.026795659), (-0.039984877, -0.001099835))
            Line((-0.039984877, -0.001099835), (0.001099835, -0.039984877))
            ThreePointArc((0.001099835, -0.039984877), (1.028995329, -0.011711299), (2.058446225, -0.039984877))
            Line((2.058446225, -0.039984877), (2.05734639, 0))
        make_face()
    chamfer_10_piece_3a = extrude(amount=8.143365976, mode=Mode.PRIVATE)
    chamfer_10_piece_3a = split(chamfer_10_piece_3a, bisect_by=Plane(origin=(-3.88416309, 11.828035968, -15.659587254), z_dir=(-0.7660444431189746, 0.6427876096865436, 0)), keep=Keep.TOP, mode=Mode.PRIVATE)
    with BuildSketch(Plane(origin=(-15.017406552, -1.440046925, -15), x_dir=(-0.765754814669836, 0.642544582561693, 0.02749587661058647), z_dir=(0.6427876096865436, 0.7660444431189746, 0))) as chamfer_10_piece_3b_section:
        with BuildLine():
            Line((2.05734639, 0), (-0.11309431, -2.054235587))
            Line((-0.11309431, -2.054235587), (-0.153079186, -2.053135752))
            ThreePointArc((-0.153079186, -2.053135752), (-0.068258454, -1.026795659), (-0.039984877, 0.001099835))
            Line((-0.039984877, 0.001099835), (0.001099835, 0.039984877))
            ThreePointArc((0.001099835, 0.039984877), (1.028995329, 0.011711299), (2.058446225, 0.039984877))
            Line((2.058446225, 0.039984877), (2.05734639, 0))
        make_face()
    chamfer_10_piece_3b = extrude(amount=21.804030845, mode=Mode.PRIVATE)
    chamfer_10_piece_3b = split(chamfer_10_piece_3b, bisect_by=Plane(origin=(-4.813410755, 11.746737331, -15.659587254), z_dir=(0.6427876096865439, 0.7660444431189745, 0)), keep=Keep.TOP, mode=Mode.PRIVATE)
    chamfer_10_piece_3 = chamfer_10_piece_3a & chamfer_10_piece_3b
    add(chamfer_10_piece_3)


solid = part.part
